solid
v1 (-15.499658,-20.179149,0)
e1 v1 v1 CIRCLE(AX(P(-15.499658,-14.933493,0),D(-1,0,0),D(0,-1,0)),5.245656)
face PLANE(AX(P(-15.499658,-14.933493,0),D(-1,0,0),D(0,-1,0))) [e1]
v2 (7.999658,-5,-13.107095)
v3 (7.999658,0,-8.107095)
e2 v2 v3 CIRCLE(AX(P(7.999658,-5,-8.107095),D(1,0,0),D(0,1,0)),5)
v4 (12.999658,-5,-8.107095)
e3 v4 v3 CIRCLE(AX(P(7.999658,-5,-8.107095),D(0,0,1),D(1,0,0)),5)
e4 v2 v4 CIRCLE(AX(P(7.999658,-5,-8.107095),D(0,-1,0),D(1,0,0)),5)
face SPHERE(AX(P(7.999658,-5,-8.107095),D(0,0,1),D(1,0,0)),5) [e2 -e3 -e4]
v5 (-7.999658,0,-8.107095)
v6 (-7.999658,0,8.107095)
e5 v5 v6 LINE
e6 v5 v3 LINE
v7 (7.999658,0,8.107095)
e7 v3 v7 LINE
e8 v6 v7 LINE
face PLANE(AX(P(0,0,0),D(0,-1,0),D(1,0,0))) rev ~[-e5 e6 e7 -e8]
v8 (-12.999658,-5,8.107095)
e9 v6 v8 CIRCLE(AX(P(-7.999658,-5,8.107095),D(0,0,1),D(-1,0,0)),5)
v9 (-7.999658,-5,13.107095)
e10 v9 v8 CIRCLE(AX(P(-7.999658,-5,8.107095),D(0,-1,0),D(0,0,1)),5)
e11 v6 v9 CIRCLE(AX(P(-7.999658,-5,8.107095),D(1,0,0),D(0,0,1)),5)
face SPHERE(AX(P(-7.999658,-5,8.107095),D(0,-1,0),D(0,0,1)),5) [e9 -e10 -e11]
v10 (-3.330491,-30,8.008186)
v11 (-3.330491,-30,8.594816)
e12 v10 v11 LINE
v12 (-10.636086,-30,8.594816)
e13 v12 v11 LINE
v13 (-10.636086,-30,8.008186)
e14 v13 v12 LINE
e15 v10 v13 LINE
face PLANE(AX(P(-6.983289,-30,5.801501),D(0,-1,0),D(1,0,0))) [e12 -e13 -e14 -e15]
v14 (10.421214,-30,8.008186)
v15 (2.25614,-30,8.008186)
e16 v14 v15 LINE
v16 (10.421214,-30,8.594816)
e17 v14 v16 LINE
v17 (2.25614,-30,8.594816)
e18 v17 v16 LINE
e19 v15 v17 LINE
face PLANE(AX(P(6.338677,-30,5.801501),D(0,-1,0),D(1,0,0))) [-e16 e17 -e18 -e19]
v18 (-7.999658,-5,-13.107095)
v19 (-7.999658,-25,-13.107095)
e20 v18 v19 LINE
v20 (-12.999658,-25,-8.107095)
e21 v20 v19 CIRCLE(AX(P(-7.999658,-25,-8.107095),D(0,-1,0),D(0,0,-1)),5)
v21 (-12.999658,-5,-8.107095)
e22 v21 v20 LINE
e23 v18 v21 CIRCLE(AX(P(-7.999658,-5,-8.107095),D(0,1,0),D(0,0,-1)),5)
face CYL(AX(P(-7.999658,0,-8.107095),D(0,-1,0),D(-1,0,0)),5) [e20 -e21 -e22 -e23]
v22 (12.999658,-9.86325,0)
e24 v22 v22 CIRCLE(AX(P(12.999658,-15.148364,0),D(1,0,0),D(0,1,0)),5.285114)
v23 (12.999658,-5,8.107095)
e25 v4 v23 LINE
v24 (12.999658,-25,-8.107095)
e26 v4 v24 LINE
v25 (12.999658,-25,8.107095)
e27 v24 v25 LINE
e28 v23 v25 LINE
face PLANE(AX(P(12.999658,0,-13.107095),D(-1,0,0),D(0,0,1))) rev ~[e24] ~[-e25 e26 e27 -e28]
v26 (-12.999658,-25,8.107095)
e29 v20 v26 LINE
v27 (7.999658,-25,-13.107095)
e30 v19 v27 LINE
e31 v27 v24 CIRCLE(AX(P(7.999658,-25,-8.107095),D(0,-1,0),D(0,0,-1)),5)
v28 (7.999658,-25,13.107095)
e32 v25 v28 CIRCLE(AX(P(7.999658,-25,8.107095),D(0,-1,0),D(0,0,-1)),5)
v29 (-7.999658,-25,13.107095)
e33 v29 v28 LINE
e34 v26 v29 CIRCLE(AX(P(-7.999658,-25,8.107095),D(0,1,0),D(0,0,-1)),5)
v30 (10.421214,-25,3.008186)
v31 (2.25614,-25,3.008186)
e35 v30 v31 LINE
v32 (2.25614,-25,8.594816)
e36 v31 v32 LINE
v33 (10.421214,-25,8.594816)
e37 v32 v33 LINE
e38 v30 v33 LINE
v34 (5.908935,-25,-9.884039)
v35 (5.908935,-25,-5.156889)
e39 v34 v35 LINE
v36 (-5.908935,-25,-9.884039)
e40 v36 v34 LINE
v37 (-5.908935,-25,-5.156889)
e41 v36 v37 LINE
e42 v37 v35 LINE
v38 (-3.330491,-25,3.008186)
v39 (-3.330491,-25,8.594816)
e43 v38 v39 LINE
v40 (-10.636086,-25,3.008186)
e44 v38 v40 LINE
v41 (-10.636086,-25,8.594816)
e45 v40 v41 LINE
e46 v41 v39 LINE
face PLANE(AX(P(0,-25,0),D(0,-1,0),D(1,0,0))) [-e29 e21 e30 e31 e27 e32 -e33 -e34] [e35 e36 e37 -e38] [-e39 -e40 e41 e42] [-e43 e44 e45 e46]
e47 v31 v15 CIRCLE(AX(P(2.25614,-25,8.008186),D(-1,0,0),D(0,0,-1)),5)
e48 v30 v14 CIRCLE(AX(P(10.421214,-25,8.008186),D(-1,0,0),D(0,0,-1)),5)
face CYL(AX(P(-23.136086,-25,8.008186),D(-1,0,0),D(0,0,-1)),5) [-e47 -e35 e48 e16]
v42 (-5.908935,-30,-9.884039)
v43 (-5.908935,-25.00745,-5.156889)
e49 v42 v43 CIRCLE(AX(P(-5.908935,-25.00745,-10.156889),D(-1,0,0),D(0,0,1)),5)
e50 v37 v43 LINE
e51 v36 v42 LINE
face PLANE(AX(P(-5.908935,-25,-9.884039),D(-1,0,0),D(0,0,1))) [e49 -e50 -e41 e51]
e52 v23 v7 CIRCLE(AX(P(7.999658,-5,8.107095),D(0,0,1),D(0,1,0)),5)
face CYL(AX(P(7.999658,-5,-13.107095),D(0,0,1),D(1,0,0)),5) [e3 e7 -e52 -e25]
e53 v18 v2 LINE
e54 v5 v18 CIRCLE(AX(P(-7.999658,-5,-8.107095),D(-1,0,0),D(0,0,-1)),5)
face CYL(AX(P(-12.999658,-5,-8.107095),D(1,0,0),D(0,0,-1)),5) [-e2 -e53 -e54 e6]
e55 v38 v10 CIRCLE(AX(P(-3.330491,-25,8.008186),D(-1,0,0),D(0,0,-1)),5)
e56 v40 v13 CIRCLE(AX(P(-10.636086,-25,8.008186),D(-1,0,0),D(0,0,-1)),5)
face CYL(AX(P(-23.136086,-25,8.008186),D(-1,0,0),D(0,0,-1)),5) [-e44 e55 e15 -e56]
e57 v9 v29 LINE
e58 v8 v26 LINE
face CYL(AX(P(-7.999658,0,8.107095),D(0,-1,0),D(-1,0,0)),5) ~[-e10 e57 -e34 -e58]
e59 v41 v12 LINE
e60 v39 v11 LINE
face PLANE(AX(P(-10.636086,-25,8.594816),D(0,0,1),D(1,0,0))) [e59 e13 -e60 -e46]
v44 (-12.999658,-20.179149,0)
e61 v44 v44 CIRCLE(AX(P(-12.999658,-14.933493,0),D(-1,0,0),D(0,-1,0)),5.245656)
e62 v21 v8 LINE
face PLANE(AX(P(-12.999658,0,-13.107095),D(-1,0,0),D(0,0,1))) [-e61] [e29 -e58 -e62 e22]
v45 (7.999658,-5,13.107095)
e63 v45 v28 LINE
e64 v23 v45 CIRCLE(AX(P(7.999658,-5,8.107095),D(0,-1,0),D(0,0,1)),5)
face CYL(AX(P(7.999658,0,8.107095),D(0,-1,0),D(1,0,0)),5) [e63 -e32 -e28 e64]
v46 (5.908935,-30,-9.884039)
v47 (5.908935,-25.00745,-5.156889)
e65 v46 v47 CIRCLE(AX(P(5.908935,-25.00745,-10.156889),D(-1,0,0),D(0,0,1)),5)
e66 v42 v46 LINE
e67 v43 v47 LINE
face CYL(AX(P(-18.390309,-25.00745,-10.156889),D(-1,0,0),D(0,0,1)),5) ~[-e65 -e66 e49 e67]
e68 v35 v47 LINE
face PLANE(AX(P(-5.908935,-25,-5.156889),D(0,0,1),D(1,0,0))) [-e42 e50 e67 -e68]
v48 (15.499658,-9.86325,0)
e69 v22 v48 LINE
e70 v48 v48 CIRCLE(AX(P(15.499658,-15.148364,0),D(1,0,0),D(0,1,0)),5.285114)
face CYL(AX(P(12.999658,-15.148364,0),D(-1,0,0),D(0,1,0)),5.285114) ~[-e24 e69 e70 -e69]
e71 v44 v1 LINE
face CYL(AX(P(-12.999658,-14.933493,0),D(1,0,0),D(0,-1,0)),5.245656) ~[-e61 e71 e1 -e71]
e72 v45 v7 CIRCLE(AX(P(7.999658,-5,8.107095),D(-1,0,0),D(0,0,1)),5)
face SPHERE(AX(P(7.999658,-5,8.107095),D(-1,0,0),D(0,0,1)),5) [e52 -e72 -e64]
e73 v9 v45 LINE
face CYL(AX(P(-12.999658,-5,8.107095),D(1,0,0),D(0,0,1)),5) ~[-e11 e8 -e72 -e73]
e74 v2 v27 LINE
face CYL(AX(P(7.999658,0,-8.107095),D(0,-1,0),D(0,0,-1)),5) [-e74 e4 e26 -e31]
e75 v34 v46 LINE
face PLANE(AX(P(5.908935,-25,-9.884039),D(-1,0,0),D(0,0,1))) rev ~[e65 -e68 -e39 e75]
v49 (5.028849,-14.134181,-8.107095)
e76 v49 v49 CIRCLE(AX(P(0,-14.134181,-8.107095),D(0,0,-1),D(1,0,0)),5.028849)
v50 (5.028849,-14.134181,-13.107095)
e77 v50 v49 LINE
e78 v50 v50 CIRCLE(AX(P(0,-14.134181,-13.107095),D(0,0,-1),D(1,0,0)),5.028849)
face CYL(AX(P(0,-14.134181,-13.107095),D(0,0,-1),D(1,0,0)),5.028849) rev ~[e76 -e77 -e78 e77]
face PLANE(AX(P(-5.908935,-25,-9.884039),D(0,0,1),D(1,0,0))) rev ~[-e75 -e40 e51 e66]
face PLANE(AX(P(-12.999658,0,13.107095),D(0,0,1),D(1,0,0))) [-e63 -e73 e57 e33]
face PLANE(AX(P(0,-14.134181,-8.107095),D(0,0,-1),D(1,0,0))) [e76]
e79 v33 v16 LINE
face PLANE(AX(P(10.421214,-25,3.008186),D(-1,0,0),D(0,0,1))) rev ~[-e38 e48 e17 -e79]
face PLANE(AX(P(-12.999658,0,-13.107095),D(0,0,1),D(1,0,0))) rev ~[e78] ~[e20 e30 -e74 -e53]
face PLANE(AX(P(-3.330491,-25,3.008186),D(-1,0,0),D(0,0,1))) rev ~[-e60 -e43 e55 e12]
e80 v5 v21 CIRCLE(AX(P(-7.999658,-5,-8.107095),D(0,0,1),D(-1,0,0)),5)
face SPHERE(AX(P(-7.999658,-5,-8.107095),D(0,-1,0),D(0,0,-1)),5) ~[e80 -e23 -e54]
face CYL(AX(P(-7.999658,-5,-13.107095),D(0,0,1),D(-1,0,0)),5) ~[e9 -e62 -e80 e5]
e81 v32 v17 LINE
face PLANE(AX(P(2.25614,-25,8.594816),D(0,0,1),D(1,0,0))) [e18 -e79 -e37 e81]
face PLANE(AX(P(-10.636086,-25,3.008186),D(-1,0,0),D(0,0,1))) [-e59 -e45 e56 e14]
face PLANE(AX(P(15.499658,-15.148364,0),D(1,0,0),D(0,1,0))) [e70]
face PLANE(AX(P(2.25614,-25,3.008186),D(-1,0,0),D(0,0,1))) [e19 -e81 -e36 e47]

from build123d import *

# Parameters (mm, degrees)
F0_W        = 25.9993169457
F0_H        = 26.2141898274
F1_DEPTH    = 25
F2_R        = 5
F3_W        = 8.165073581
F3_H        = 5.5866301991
F3_W_2      = 7.3055946268
F4_W        = 11.8178697303
F4_H        = 4.7271503136
F5_DEPTH    = 5
F6_T1_DEPTH = 32.3055946268
F6_T3_DEPTH = 33.165073581
F6_T5_DEPTH = 36.7806185015
F7_R        = 5.2851135751
F9_DEPTH    = 2.5
F8_R        = 5.2456555176
F10_DEPTH   = 2.5
F11_R       = 5.0288488875
F12_DEPTH   = 5


# Not quite as in the source:
# - a fillet or chamfer that OpenCascade refuses, or shapes differently, is made with other operations: its cross-section is extruded or revolved along the edge and cut away or added


with BuildPart() as f1:
    # F0 (on Front) → F1 (new body)
    with BuildSketch(Plane.XZ):
        Rectangle(F0_W, F0_H)
    extrude(amount=F1_DEPTH)

    # F2
    f2_edges = [f1.edges().sort_by_distance(p)[0] for p in [
        (-12.999658, -12.5, 13.107095),
        (0, 0, 13.107095),
        (12.999658, -12.5, 13.107095),
        (12.999658, 0, 0),
        (12.999658, -12.5, -13.107095),
        (-12.999658, -12.5, -13.107095),
        (0, 0, -13.107095),
        (-12.999658, 0, 0),
    ]]
    fillet(f2_edges, radius=F2_R)

    # F3 (on face) + F4 (on face) → F5 (join)
    with BuildSketch(Plane.XZ.offset(25)):
        with Locations((6.3386769034, 5.8015007526)):
            Rectangle(F3_W, F3_H)
        with Locations((-6.9832885638, 5.8015007526)):
            Rectangle(F3_W_2, F3_H)
    with BuildSketch(Plane.XZ.offset(25)):
        with Locations((0, -7.5204637833)):
            Rectangle(F4_W, F4_H)
    extrude(amount=F5_DEPTH)

    # F6: fillet of radius 5 on 3 edges, made by hand

    # F6_s2 → F6_t1 (cut)
    with BuildSketch(Plane.YZ.offset(-23.1360858772)):
        with BuildLine():
            ThreePointArc((-25, 3.008185653), (-28.5355339059, 4.4726517471), (-30, 8.008185653))
            Line((-30, 8.008185653), (-30, 3.008185653))
            Line((-30, 3.008185653), (-25, 3.008185653))
        make_face()
    extrude(amount=F6_T1_DEPTH, mode=Mode.SUBTRACT)

    # F6_s4 → F6_t3 (cut)
    with BuildSketch(Plane.YZ.offset(-10.2438598871)):
        with BuildLine():
            ThreePointArc((-25, 3.008185653), (-28.5355339059, 4.4726517471), (-30, 8.008185653))
            Line((-30, 8.008185653), (-30, 3.008185653))
            Line((-30, 3.008185653), (-25, 3.008185653))
        make_face()
    extrude(amount=F6_T3_DEPTH, mode=Mode.SUBTRACT)

    # F6_s6 → F6_t5 (cut)
    with BuildSketch(Plane.YZ.offset(-18.3903092508)):
        with BuildLine():
            ThreePointArc((-25.0074502458, -5.1568886265), (-28.4451639895, -6.5261691088), (-30, -9.8840389401))
            Line((-30, -9.8840389401), (-30, -5.1568886265))
            Line((-30, -5.1568886265), (-25.0074502458, -5.1568886265))
        make_face()
    extrude(amount=F6_T5_DEPTH, mode=Mode.SUBTRACT)

    # F7 (on face) → F9 (join)
    with BuildSketch(Plane.YZ.offset(12.9996584728)):
        with Locations((-15.1483640075, 0)):
            Circle(F7_R)
    extrude(amount=F9_DEPTH)

    # F8 (on face) → F10 (join)
    with BuildSketch(Plane(origin=(-12.9996584728, 0, 0), x_dir=(0, -1, 0), z_dir=(-1, 0, 0))):
        with Locations((14.9334929883, 0)):
            Circle(F8_R)
    extrude(amount=F10_DEPTH)

    # F11 (on face) → F12 (cut)
    with BuildSketch(Plane(origin=(0, 0, -13.1070949137), x_dir=(1, 0, 0), z_dir=(0, 0, -1))):
        with Locations((0, 14.1341807321)):
            Circle(F11_R)
    extrude(amount=-F12_DEPTH, mode=Mode.SUBTRACT)


solid = f1.part
